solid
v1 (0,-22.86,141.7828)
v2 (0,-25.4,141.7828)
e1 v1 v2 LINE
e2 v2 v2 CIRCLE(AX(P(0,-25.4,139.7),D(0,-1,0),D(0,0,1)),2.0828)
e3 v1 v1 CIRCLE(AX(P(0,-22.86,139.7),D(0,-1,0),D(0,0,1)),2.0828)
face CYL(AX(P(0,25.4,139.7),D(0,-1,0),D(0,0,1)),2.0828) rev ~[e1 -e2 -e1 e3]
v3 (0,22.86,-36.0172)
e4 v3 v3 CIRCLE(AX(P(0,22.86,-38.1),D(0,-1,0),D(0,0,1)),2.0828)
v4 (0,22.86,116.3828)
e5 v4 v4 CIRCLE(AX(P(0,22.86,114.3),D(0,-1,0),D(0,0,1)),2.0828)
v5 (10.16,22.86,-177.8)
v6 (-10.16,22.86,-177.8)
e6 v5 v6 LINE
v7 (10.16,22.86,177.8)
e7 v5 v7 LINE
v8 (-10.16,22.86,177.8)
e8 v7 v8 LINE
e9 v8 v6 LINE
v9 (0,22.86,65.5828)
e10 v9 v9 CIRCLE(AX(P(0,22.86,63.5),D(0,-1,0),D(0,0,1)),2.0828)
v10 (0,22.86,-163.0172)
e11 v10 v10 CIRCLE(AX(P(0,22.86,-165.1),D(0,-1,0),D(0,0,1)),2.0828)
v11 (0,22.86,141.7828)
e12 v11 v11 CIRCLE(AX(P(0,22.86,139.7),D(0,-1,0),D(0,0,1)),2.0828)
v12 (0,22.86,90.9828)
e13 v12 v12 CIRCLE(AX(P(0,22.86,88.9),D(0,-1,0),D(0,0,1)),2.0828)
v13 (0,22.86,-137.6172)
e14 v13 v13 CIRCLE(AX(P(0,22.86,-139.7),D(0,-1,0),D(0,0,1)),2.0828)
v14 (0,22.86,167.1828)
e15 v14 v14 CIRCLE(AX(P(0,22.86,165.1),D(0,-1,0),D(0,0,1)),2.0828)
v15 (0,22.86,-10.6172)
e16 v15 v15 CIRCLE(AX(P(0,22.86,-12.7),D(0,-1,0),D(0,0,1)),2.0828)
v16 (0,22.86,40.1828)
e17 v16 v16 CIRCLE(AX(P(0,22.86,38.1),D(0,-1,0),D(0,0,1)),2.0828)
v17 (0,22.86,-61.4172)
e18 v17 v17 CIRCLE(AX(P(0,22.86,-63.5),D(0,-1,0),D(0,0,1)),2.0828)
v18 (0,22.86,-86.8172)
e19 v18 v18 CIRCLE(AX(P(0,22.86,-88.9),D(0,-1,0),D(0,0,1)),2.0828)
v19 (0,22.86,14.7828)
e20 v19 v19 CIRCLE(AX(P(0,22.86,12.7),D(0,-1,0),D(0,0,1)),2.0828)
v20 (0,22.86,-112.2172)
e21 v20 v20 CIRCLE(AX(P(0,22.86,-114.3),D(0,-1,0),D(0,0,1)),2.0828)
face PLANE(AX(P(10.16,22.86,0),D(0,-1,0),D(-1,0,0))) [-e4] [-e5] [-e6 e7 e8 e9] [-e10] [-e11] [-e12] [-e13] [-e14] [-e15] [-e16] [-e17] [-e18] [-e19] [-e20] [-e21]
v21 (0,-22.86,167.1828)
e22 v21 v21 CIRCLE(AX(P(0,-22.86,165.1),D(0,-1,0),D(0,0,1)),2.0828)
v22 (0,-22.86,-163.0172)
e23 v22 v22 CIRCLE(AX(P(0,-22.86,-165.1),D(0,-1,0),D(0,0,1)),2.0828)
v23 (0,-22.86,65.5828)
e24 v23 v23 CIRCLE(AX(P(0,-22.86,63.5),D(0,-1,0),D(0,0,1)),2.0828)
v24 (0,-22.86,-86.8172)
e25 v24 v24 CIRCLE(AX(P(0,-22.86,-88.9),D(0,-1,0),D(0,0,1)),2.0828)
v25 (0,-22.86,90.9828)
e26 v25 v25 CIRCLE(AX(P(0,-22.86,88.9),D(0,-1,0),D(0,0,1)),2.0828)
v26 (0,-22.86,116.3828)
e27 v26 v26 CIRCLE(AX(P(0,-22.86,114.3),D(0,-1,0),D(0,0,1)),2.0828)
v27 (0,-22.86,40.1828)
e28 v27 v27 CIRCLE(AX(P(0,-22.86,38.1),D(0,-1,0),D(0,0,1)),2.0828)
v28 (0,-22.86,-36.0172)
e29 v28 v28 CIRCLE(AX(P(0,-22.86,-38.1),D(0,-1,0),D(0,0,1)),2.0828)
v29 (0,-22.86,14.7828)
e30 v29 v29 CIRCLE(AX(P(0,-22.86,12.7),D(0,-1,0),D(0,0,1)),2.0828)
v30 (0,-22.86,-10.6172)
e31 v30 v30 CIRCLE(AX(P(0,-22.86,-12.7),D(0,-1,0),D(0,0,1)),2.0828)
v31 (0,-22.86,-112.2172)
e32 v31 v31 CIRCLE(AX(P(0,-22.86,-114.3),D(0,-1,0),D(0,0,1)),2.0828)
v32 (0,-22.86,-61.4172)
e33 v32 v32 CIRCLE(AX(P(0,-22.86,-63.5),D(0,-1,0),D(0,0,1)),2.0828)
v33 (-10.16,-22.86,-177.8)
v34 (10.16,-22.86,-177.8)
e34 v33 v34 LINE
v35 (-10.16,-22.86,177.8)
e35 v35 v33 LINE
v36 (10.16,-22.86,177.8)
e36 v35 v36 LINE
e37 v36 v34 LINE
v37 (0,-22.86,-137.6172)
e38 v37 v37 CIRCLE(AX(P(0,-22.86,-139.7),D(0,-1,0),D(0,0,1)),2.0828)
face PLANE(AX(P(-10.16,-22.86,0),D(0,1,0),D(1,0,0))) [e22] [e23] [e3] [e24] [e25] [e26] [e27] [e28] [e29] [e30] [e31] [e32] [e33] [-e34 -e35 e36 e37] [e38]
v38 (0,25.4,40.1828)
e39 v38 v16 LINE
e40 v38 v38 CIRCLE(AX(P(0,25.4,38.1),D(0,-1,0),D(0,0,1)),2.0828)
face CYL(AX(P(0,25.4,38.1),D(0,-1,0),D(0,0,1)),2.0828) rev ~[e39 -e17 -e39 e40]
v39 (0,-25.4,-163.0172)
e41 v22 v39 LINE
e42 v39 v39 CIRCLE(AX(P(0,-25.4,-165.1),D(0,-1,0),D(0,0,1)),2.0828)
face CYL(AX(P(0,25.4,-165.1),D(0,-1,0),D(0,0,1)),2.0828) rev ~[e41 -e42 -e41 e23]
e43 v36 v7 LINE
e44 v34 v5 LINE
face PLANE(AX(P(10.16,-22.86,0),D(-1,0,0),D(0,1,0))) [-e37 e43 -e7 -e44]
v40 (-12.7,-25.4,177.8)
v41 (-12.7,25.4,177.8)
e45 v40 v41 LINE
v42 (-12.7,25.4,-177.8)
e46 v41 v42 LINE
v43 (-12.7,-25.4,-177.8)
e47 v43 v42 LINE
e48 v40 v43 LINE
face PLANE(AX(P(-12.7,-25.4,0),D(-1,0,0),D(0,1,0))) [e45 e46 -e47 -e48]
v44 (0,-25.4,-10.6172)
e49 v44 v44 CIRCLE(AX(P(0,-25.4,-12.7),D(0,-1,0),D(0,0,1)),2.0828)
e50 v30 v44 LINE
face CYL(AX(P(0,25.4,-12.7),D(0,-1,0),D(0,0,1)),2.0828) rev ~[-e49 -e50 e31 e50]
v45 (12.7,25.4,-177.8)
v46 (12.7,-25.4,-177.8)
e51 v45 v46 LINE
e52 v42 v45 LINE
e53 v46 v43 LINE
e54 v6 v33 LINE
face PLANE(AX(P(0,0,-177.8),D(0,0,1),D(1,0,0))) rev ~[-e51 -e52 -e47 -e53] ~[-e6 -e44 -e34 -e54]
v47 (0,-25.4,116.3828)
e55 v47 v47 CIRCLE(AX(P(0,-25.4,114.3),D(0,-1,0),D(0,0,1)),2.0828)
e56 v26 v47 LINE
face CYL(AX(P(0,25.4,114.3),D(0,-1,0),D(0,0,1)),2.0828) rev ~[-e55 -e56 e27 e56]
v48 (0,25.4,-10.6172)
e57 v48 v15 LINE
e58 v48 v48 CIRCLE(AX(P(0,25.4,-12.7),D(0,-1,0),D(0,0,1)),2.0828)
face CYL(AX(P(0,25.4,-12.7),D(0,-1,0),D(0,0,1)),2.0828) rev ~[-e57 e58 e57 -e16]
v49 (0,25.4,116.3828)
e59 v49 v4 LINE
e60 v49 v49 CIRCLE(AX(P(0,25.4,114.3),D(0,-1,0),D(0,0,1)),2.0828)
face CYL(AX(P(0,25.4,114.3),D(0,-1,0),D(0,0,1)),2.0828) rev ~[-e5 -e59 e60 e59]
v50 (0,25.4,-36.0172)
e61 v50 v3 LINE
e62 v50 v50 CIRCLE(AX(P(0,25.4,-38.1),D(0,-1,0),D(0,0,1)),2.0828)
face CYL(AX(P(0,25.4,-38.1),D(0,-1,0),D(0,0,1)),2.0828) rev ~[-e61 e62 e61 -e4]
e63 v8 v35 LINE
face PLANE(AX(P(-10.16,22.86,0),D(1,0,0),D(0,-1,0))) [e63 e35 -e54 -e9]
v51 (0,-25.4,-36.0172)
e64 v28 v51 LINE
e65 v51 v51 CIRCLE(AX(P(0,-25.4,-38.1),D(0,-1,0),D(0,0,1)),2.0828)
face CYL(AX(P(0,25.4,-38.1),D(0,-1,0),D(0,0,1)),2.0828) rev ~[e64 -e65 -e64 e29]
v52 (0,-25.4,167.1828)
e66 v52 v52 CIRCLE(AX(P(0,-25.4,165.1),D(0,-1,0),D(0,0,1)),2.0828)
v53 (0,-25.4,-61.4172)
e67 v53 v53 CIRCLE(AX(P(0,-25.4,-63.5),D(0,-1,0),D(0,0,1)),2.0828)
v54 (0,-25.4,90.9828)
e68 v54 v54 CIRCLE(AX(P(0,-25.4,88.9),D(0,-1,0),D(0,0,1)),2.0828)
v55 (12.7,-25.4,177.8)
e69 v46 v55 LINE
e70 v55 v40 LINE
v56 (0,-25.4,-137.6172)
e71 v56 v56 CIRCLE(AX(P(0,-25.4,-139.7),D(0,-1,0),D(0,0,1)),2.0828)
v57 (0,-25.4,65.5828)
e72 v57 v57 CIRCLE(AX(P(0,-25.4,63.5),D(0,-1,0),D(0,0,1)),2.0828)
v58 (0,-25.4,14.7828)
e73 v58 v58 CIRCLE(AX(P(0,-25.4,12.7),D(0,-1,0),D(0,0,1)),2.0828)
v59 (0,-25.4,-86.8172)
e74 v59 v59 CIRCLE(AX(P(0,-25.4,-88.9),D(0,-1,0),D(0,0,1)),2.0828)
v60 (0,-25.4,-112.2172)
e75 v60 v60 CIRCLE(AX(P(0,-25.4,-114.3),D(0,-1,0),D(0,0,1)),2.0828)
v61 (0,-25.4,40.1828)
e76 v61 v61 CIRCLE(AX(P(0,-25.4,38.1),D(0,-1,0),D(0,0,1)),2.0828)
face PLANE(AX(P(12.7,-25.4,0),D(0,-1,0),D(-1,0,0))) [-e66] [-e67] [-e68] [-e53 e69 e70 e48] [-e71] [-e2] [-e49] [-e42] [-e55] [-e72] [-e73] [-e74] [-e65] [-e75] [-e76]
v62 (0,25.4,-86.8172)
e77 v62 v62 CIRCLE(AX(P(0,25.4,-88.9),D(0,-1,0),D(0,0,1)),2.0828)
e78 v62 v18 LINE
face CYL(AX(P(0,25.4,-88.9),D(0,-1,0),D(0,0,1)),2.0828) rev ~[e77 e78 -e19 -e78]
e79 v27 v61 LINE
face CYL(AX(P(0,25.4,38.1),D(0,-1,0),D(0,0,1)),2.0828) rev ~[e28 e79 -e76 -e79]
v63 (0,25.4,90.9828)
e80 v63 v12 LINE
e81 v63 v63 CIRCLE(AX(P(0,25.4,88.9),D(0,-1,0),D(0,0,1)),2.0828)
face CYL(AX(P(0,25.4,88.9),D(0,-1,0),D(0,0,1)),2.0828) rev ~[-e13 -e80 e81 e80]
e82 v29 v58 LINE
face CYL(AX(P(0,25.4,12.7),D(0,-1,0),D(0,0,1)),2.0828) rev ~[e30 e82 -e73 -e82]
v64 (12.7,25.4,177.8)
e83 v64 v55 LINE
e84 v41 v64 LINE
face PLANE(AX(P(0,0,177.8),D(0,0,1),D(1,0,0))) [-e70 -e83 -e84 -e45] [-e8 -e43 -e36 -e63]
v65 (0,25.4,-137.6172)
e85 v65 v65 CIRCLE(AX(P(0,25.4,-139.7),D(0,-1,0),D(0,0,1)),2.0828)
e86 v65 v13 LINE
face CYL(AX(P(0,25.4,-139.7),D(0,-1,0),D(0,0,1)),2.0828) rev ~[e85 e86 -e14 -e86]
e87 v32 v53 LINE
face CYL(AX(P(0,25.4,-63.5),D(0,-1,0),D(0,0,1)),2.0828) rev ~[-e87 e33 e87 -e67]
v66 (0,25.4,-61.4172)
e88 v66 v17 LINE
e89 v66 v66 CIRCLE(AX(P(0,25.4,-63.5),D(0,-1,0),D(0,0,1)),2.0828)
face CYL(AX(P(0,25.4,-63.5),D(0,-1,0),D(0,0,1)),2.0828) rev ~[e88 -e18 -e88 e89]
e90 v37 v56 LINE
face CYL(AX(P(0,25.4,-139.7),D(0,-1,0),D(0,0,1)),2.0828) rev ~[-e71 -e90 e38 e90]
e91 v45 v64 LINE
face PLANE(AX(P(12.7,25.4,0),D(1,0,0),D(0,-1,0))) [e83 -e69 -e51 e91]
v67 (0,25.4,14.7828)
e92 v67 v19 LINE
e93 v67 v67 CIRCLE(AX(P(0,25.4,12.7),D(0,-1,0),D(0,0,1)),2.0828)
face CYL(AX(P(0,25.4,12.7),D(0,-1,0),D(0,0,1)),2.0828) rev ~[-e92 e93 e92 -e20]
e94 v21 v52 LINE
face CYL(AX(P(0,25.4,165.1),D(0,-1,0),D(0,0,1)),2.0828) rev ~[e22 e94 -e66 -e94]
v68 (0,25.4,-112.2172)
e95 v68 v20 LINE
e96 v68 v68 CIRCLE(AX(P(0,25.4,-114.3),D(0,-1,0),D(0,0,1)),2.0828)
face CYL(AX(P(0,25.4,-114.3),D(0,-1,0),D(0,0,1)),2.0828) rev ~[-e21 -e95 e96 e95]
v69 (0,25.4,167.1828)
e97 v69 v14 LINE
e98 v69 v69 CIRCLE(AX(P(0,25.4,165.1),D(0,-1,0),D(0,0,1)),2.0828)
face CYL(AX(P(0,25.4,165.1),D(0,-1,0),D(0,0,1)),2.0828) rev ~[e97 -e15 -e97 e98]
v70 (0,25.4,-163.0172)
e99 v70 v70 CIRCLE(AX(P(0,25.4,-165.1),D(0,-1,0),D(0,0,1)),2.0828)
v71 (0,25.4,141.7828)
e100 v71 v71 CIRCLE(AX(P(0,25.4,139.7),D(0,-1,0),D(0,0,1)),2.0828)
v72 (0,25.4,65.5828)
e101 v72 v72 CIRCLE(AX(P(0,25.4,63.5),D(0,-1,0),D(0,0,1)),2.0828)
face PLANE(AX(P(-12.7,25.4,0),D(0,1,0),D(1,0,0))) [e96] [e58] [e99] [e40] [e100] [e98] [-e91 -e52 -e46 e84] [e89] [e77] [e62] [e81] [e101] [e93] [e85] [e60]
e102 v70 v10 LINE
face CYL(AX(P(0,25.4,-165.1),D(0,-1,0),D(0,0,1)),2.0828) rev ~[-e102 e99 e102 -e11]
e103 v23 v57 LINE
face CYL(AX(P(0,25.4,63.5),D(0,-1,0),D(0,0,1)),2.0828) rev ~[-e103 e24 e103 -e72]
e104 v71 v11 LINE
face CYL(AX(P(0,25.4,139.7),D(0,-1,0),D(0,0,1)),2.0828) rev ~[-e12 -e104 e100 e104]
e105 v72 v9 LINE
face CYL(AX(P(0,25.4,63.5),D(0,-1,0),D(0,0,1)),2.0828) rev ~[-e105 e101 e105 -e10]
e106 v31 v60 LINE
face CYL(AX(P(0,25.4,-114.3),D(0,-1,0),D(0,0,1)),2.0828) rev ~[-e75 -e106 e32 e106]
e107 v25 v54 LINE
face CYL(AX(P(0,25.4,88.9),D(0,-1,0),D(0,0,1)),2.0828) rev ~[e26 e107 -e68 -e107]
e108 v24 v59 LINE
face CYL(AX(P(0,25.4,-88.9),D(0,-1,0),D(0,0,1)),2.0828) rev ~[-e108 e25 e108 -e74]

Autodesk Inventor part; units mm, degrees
ref_plane "YZ Plane" through (0, 0, 0) normal (1, 0, 0) x (0, 1, 0)
ref_plane "XZ Plane" through (0, 0, 0) normal (0, 1, 0) x (-1, 0, 0)
ref_plane "XY Plane" through (0, 0, 0) normal (0, 0, 1) x (1, 0, 0)
sketch "Sketch1" plane through (0, 0, 0) normal (0, 0, 1) x (1, 0, 0)
  line L0 (12.7, -25.4) -> (-12.7, -25.4)
  line L1 (-12.7, -25.4) -> (-12.7, 25.4)
  line L2 (-12.7, 25.4) -> (12.7, 25.4)
  line L3 (12.7, 25.4) -> (12.7, -25.4)
  line L4 (12.7, -25.4) -> (-12.7, 25.4) construction
  line L5 (-12.7, -25.4) -> (12.7, 25.4) construction
  line L6 (10.16, 22.86) -> (-10.16, 22.86)
  line L7 (-10.16, 22.86) -> (-10.16, -22.86)
  line L8 (-10.16, -22.86) -> (10.16, -22.86)
  line L9 (10.16, -22.86) -> (10.16, 22.86)
  point P0 (0, 0)
  dimension "d0" = 25.4
  dimension "d1" = 50.8
  dimension "d2" = 2.54
extrude "Extrusion1" add sketch "Sketch1" along normal mid plane 355.6
sketch "Sketch2" plane through (-12.7, 25.4, 177.8) normal (0, 1, 0) x (1, 0, 0)
  point P0 (12.7, 177.8)
  point P1 (12.7, 190.5)
  point P2 (12.7, 165.1)
  dimension "HoleOffset" = 12.7
  dimension "d6" = 12.7
hole "Hole1" at (0, 25.4, -12.7) at (0, 25.4, 12.7) direction (0, -1, 0) diameter 4.1656 end through all
pattern_linear "Rectangular Pattern1" count 31 spacing 50.8 along (0, 0, 1) of "Hole1" first direction both ways yes
properties part number "VersaFrame Side Rail" material "Aluminum 6061"
